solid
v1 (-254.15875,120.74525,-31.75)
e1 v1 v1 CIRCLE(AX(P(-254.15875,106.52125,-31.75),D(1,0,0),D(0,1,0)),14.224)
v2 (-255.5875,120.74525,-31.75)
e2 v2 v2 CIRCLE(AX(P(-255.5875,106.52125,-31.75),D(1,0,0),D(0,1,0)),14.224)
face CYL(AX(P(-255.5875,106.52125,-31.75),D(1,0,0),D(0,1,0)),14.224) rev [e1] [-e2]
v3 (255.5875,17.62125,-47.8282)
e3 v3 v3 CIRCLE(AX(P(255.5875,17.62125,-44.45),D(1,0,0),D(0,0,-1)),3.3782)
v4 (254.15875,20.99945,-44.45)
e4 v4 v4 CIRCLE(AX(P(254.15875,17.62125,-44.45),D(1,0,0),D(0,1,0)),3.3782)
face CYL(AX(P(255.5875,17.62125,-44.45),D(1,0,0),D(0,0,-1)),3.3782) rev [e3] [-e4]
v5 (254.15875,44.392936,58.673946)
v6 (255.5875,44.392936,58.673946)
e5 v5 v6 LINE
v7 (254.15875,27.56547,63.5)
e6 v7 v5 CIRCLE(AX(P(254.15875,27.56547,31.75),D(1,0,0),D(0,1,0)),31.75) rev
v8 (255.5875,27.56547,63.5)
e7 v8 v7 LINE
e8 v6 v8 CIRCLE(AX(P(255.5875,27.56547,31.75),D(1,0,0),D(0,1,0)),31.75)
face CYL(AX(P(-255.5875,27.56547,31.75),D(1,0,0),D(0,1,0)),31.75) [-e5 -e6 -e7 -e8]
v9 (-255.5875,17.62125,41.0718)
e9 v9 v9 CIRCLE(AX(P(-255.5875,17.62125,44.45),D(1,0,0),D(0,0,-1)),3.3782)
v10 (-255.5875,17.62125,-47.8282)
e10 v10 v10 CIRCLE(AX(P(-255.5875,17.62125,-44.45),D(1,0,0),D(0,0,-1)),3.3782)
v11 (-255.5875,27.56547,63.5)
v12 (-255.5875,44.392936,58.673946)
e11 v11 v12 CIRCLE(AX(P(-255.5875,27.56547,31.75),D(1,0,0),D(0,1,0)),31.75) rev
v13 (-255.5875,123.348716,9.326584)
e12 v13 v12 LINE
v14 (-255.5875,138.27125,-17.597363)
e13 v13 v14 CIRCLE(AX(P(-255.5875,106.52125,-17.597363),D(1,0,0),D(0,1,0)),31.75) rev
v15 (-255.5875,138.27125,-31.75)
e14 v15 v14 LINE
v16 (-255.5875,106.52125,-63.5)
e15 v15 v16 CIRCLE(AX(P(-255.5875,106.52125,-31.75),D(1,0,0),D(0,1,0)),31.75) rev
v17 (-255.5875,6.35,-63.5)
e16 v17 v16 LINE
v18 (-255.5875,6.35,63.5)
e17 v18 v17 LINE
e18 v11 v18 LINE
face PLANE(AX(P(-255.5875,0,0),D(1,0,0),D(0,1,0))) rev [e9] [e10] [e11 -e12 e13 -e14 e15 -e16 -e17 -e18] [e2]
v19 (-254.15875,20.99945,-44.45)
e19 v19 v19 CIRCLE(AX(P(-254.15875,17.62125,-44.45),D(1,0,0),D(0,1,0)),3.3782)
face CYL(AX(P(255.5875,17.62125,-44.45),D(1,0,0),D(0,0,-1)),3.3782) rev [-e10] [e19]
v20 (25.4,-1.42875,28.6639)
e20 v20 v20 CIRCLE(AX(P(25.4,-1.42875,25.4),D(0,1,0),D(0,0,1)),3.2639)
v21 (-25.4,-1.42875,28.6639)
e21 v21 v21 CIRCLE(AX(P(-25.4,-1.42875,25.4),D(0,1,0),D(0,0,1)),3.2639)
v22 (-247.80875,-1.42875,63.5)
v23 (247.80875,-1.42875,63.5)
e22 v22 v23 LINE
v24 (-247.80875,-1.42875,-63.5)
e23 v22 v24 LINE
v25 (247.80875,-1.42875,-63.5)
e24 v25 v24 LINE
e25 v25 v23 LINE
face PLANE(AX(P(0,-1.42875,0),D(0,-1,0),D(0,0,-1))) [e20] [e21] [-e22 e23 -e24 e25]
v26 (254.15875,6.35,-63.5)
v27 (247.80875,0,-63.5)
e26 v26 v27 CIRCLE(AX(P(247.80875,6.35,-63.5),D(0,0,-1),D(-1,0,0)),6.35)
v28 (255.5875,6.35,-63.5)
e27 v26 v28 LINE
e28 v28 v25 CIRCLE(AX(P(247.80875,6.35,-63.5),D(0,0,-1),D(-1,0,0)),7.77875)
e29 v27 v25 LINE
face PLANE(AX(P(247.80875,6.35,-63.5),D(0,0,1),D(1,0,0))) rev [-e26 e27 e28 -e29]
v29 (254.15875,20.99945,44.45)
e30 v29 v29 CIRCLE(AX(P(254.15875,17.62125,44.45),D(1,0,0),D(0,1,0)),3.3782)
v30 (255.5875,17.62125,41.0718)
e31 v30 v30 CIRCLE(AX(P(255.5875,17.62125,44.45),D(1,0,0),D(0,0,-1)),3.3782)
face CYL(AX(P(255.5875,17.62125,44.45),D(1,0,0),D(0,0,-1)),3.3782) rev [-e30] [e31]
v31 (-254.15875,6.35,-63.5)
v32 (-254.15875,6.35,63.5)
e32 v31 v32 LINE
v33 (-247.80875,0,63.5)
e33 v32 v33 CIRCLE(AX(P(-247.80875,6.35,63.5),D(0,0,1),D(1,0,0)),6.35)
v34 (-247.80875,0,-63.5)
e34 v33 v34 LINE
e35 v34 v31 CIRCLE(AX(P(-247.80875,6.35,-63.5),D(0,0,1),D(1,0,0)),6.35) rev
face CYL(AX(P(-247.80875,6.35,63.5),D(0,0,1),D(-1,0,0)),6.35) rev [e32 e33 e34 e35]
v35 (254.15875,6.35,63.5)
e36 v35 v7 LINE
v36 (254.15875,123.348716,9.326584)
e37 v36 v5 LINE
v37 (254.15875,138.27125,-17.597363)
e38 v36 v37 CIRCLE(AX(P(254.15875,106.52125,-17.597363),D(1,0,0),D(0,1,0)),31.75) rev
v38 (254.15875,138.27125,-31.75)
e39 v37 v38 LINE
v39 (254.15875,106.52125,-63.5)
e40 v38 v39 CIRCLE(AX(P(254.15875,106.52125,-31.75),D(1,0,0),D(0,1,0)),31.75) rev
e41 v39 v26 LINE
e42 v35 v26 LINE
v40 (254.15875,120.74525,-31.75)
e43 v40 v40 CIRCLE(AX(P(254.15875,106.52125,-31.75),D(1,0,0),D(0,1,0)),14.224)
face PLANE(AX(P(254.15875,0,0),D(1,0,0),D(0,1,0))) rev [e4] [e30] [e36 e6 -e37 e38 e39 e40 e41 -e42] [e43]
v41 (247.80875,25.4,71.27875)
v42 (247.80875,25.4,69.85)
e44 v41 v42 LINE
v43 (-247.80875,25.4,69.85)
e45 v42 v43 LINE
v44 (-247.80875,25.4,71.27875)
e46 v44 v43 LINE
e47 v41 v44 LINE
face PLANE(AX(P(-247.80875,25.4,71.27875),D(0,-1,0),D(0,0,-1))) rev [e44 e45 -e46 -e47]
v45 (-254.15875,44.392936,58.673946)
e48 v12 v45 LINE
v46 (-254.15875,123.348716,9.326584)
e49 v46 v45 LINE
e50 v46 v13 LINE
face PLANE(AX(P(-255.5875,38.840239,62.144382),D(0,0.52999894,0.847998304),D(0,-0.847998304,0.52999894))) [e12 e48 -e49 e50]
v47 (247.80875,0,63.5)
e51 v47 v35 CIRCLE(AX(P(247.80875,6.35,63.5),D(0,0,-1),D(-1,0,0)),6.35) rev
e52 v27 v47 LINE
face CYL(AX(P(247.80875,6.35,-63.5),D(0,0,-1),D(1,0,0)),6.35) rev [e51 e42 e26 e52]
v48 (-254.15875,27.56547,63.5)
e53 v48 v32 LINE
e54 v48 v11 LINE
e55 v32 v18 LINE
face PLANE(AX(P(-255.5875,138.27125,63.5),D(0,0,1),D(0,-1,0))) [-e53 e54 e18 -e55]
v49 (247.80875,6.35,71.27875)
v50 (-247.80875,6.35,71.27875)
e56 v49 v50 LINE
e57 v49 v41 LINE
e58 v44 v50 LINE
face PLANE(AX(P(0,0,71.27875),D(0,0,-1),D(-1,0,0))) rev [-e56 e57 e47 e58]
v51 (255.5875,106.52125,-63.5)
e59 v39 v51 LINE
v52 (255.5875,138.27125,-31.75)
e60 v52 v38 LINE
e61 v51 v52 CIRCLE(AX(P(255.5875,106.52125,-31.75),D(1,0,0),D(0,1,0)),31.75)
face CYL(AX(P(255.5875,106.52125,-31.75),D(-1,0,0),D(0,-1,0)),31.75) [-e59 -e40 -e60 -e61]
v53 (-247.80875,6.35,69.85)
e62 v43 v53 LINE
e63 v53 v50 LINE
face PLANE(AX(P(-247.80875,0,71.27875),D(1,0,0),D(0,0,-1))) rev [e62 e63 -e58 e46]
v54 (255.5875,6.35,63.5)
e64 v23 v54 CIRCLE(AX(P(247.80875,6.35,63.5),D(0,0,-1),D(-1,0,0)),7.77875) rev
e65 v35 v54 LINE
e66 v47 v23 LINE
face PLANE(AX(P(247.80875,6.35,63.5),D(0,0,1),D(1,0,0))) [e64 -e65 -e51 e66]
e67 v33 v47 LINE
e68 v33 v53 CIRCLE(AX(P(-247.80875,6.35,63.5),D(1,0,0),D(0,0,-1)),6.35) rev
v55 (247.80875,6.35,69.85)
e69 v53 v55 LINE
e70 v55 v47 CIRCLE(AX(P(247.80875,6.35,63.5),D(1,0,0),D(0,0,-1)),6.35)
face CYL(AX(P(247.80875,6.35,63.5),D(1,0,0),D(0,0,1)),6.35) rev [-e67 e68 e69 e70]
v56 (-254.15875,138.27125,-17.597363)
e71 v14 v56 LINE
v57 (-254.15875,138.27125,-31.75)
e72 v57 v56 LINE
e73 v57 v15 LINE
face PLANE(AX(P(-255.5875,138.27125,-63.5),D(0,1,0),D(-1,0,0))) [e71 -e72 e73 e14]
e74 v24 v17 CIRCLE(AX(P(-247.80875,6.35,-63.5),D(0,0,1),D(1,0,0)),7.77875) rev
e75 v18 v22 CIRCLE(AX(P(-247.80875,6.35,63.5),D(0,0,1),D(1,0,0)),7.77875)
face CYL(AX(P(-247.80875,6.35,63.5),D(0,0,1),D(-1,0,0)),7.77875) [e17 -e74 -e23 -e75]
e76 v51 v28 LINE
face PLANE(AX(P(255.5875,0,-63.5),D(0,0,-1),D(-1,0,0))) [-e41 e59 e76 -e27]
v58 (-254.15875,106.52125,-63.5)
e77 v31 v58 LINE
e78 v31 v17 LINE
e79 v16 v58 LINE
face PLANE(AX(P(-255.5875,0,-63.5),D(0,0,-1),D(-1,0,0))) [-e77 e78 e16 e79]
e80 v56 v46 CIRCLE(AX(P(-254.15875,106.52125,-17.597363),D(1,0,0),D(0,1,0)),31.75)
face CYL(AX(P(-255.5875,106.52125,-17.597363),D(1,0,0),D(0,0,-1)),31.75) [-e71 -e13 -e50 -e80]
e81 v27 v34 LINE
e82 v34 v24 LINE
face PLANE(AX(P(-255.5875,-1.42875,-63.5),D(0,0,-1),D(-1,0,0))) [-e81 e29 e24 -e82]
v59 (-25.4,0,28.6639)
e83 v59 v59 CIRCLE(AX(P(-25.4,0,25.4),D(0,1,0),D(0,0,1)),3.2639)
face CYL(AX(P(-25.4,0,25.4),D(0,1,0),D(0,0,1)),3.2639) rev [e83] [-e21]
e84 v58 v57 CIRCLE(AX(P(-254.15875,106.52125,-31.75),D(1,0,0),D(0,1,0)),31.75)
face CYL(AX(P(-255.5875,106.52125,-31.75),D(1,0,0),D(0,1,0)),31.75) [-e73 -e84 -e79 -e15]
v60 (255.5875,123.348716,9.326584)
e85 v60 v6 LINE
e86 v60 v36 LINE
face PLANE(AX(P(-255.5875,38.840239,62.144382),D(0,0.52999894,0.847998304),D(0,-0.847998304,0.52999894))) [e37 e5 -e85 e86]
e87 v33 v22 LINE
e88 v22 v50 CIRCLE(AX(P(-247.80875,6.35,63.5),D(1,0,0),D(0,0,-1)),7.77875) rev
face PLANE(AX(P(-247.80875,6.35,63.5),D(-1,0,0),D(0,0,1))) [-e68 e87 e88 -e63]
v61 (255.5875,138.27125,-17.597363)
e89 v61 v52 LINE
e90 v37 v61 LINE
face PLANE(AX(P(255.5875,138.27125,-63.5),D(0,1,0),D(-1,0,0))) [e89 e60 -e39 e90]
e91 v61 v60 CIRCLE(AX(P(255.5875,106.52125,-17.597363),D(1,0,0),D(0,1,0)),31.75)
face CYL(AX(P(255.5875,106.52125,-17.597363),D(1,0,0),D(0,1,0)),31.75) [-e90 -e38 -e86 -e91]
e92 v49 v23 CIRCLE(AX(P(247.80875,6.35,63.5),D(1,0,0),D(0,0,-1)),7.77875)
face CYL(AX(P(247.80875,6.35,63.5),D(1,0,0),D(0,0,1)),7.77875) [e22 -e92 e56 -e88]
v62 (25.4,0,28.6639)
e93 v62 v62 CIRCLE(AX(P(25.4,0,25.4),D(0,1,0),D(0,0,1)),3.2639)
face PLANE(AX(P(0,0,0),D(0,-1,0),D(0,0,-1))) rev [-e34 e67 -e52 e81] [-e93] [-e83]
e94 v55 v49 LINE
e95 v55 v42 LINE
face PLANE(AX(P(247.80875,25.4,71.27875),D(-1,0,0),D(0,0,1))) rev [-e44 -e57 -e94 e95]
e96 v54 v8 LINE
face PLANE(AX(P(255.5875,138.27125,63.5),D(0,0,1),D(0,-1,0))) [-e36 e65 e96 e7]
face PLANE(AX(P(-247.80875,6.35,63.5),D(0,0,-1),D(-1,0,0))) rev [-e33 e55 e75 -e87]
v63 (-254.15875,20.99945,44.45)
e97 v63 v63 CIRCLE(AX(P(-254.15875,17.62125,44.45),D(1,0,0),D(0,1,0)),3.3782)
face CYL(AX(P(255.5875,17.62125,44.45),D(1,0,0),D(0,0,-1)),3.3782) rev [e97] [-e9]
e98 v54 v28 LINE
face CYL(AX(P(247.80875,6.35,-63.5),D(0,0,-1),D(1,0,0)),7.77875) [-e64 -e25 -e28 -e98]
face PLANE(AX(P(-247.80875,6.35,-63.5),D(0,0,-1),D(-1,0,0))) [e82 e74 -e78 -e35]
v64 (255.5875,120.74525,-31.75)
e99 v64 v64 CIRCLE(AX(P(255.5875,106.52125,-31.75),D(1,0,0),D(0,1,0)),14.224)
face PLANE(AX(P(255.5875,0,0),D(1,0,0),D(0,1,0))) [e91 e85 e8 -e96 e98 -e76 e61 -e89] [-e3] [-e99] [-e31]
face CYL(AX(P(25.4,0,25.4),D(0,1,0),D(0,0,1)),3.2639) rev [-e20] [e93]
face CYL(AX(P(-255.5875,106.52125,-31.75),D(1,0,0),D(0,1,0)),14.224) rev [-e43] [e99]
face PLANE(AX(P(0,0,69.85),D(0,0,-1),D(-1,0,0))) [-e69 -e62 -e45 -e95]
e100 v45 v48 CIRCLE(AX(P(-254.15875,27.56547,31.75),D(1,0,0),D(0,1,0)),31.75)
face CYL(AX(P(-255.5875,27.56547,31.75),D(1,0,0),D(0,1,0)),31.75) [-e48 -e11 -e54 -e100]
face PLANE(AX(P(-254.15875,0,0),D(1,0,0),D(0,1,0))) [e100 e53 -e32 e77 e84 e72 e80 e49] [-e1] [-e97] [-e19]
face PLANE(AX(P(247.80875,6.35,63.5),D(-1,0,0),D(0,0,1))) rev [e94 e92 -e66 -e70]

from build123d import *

# Parameters (mm, degrees)
SKETCH1_W                      = 511.175
SKETCH1_H                      = 127
BASE_FLANGE1_DEPTH             = 1.42875
EDGE_FLANGE1_STRIP_W           = 18.415
EDGE_FLANGE1_STRIP_H           = 1.42875
EDGE_FLANGE1_STRIP_CUT_DEPTH   = 127
EDGE_FLANGE1_STRIP_2_W         = 18.415
EDGE_FLANGE1_STRIP_2_H         = 1.42875
EDGE_FLANGE1_STRIP_CUT_2_DEPTH = 127
EDGE_FLANGE1_DEPTH             = 127
EDGE_FLANGE1_BEND_DEPTH        = 127
CUT_EXTRUDE1_DEPTH             = 534.339544007
FILLET1_R                      = 31.75
SKETCH14_R                     = 14.224
CUT_EXTRUDE2_DEPTH             = 534.339544007
H_0_266_DIAMETER_HOLE1_D       = 6.7564
F_0_257_DIAMETER_HOLE2_D       = 6.5278
EDGE_FLANGE2_DEPTH             = 495.6175


# Sheet-metal steps are written as plain solids
with BuildPart() as part:
    # Sketch1 → Base-Flange1 (new body)
    with BuildSketch(Plane(origin=(0, 0, 0), x_dir=(1, 0, 0), z_dir=(0, 1, 0))):
        Rectangle(SKETCH1_W, SKETCH1_H)
    extrude(amount=-BASE_FLANGE1_DEPTH)

    # Edge-Flange1 strip (across the edge) → Edge-Flange1 strip cut (cut)
    with BuildSketch(Plane(origin=(255.5875, 0, 63.5), x_dir=(-1, 0, 0), z_dir=(0, 0, -1))):
        with Locations((-1.42875, -0.714375)):
            Rectangle(EDGE_FLANGE1_STRIP_W, EDGE_FLANGE1_STRIP_H)
    extrude(amount=EDGE_FLANGE1_STRIP_CUT_DEPTH, mode=Mode.SUBTRACT)

    # Edge-Flange1 strip 2 (across the edge) → Edge-Flange1 strip cut 2 (cut)
    with BuildSketch(Plane(origin=(-255.5875, 0, -63.5), x_dir=(1, 0, 0), z_dir=(0, 0, 1))):
        with Locations((-1.42875, -0.714375)):
            Rectangle(EDGE_FLANGE1_STRIP_2_W, EDGE_FLANGE1_STRIP_2_H)
    extrude(amount=EDGE_FLANGE1_STRIP_CUT_2_DEPTH, mode=Mode.SUBTRACT)

    # Edge-Flange1 section (across the edge) → Edge-Flange1 (add)
    with BuildSketch(Plane(origin=(255.5875, 0, 63.5), x_dir=(-1, 0, 0), z_dir=(0, 0, -1))):
        with BuildLine():
            Line((0, 6.35), (0, 138.27125))
            Line((0, 138.27125), (1.42875, 138.27125))
            Line((1.42875, 138.27125), (1.42875, 6.35))
            ThreePointArc((1.42875, 6.35), (3.288621939, 1.859871939), (7.77875, 0))
            Line((7.77875, 0), (7.77875, -1.42875))
            ThreePointArc((7.77875, -1.42875), (2.278343126, 0.849593126), (0, 6.35))
        make_face()
    extrude(amount=EDGE_FLANGE1_DEPTH)

    # Edge-Flange1 section 2 (across the edge) → Edge-Flange1 bend (add)
    with BuildSketch(Plane(origin=(-255.5875, 0, -63.5), x_dir=(1, 0, 0), z_dir=(0, 0, 1))):
        with BuildLine():
            Line((0, 6.35), (0, 138.27125))
            Line((0, 138.27125), (1.42875, 138.27125))
            Line((1.42875, 138.27125), (1.42875, 6.35))
            ThreePointArc((1.42875, 6.35), (3.288621939, 1.859871939), (7.77875, 0))
            Line((7.77875, 0), (7.77875, -1.42875))
            ThreePointArc((7.77875, -1.42875), (2.278343126, 0.849593126), (0, 6.35))
        make_face()
    extrude(amount=EDGE_FLANGE1_BEND_DEPTH)

    # Sketch13 → Cut-Extrude1 (cut, through all)
    with BuildSketch(Plane(origin=(255.5875, 0, 0), x_dir=(0, 0, -1), z_dir=(1, 0, 0))):
        Polygon((-63.5, 36.67125), (0, 138.27125), (-63.5, 138.27125), align=None)
    extrude(amount=-CUT_EXTRUDE1_DEPTH, mode=Mode.SUBTRACT)

    # Fillet1
    fillet1_edges = [part.edges().sort_by_distance(p)[0] for p in [
        (254.873125, 138.27125, -63.5),
        (-254.873125, 138.27125, -63.5),
        (254.873125, 138.27125, 0),
        (254.873125, 36.67125, 63.5),
        (-254.873125, 138.27125, 0),
        (-254.873125, 36.67125, 63.5),
    ]]
    fillet(fillet1_edges, radius=FILLET1_R)

    # Sketch14 → Cut-Extrude2 (cut, through all)
    with BuildSketch(Plane(origin=(255.5875, 0, 0), x_dir=(0, 0, -1), z_dir=(1, 0, 0))):
        with Locations(Location((31.75, 106.52125, 0), (0, 0, 90))):
            Circle(SKETCH14_R)
    extrude(amount=-CUT_EXTRUDE2_DEPTH, mode=Mode.SUBTRACT)

    # H (0.266) Diameter Hole1 (through all)
    with Locations(Plane(origin=(255.5875, 0, 0), x_dir=(0, 0, -1), z_dir=(1, 0, 0))):
        with Locations((-44.45, 17.62125), (44.45, 17.62125)):
            Hole(H_0_266_DIAMETER_HOLE1_D / 2)

    # F (0.257) Diameter Hole2 (through all)
    with Locations(Plane(origin=(0, 0, 0), x_dir=(1, 0, 0), z_dir=(0, 1, 0))):
        with Locations((-25.4, -25.4), (25.4, -25.4)):
            Hole(F_0_257_DIAMETER_HOLE2_D / 2)

    # Edge-Flange2 section (across the edge) → Edge-Flange2 (add)
    with BuildSketch(Plane(origin=(-247.80875, 0, 69.85), x_dir=(0, 0, -1), z_dir=(1, 0, 0))):
        with BuildLine():
            Line((-1.42875, 6.35), (-1.42875, 25.4))
            Line((-1.42875, 25.4), (0, 25.4))
            Line((0, 25.4), (0, 6.35))
            ThreePointArc((0, 6.35), (1.859871939, 1.859871939), (6.35, 0))
            Line((6.35, 0), (6.35, -1.42875))
            ThreePointArc((6.35, -1.42875), (0.849593126, 0.849593126), (-1.42875, 6.35))
        make_face()
    extrude(amount=EDGE_FLANGE2_DEPTH)


solid = part.part
